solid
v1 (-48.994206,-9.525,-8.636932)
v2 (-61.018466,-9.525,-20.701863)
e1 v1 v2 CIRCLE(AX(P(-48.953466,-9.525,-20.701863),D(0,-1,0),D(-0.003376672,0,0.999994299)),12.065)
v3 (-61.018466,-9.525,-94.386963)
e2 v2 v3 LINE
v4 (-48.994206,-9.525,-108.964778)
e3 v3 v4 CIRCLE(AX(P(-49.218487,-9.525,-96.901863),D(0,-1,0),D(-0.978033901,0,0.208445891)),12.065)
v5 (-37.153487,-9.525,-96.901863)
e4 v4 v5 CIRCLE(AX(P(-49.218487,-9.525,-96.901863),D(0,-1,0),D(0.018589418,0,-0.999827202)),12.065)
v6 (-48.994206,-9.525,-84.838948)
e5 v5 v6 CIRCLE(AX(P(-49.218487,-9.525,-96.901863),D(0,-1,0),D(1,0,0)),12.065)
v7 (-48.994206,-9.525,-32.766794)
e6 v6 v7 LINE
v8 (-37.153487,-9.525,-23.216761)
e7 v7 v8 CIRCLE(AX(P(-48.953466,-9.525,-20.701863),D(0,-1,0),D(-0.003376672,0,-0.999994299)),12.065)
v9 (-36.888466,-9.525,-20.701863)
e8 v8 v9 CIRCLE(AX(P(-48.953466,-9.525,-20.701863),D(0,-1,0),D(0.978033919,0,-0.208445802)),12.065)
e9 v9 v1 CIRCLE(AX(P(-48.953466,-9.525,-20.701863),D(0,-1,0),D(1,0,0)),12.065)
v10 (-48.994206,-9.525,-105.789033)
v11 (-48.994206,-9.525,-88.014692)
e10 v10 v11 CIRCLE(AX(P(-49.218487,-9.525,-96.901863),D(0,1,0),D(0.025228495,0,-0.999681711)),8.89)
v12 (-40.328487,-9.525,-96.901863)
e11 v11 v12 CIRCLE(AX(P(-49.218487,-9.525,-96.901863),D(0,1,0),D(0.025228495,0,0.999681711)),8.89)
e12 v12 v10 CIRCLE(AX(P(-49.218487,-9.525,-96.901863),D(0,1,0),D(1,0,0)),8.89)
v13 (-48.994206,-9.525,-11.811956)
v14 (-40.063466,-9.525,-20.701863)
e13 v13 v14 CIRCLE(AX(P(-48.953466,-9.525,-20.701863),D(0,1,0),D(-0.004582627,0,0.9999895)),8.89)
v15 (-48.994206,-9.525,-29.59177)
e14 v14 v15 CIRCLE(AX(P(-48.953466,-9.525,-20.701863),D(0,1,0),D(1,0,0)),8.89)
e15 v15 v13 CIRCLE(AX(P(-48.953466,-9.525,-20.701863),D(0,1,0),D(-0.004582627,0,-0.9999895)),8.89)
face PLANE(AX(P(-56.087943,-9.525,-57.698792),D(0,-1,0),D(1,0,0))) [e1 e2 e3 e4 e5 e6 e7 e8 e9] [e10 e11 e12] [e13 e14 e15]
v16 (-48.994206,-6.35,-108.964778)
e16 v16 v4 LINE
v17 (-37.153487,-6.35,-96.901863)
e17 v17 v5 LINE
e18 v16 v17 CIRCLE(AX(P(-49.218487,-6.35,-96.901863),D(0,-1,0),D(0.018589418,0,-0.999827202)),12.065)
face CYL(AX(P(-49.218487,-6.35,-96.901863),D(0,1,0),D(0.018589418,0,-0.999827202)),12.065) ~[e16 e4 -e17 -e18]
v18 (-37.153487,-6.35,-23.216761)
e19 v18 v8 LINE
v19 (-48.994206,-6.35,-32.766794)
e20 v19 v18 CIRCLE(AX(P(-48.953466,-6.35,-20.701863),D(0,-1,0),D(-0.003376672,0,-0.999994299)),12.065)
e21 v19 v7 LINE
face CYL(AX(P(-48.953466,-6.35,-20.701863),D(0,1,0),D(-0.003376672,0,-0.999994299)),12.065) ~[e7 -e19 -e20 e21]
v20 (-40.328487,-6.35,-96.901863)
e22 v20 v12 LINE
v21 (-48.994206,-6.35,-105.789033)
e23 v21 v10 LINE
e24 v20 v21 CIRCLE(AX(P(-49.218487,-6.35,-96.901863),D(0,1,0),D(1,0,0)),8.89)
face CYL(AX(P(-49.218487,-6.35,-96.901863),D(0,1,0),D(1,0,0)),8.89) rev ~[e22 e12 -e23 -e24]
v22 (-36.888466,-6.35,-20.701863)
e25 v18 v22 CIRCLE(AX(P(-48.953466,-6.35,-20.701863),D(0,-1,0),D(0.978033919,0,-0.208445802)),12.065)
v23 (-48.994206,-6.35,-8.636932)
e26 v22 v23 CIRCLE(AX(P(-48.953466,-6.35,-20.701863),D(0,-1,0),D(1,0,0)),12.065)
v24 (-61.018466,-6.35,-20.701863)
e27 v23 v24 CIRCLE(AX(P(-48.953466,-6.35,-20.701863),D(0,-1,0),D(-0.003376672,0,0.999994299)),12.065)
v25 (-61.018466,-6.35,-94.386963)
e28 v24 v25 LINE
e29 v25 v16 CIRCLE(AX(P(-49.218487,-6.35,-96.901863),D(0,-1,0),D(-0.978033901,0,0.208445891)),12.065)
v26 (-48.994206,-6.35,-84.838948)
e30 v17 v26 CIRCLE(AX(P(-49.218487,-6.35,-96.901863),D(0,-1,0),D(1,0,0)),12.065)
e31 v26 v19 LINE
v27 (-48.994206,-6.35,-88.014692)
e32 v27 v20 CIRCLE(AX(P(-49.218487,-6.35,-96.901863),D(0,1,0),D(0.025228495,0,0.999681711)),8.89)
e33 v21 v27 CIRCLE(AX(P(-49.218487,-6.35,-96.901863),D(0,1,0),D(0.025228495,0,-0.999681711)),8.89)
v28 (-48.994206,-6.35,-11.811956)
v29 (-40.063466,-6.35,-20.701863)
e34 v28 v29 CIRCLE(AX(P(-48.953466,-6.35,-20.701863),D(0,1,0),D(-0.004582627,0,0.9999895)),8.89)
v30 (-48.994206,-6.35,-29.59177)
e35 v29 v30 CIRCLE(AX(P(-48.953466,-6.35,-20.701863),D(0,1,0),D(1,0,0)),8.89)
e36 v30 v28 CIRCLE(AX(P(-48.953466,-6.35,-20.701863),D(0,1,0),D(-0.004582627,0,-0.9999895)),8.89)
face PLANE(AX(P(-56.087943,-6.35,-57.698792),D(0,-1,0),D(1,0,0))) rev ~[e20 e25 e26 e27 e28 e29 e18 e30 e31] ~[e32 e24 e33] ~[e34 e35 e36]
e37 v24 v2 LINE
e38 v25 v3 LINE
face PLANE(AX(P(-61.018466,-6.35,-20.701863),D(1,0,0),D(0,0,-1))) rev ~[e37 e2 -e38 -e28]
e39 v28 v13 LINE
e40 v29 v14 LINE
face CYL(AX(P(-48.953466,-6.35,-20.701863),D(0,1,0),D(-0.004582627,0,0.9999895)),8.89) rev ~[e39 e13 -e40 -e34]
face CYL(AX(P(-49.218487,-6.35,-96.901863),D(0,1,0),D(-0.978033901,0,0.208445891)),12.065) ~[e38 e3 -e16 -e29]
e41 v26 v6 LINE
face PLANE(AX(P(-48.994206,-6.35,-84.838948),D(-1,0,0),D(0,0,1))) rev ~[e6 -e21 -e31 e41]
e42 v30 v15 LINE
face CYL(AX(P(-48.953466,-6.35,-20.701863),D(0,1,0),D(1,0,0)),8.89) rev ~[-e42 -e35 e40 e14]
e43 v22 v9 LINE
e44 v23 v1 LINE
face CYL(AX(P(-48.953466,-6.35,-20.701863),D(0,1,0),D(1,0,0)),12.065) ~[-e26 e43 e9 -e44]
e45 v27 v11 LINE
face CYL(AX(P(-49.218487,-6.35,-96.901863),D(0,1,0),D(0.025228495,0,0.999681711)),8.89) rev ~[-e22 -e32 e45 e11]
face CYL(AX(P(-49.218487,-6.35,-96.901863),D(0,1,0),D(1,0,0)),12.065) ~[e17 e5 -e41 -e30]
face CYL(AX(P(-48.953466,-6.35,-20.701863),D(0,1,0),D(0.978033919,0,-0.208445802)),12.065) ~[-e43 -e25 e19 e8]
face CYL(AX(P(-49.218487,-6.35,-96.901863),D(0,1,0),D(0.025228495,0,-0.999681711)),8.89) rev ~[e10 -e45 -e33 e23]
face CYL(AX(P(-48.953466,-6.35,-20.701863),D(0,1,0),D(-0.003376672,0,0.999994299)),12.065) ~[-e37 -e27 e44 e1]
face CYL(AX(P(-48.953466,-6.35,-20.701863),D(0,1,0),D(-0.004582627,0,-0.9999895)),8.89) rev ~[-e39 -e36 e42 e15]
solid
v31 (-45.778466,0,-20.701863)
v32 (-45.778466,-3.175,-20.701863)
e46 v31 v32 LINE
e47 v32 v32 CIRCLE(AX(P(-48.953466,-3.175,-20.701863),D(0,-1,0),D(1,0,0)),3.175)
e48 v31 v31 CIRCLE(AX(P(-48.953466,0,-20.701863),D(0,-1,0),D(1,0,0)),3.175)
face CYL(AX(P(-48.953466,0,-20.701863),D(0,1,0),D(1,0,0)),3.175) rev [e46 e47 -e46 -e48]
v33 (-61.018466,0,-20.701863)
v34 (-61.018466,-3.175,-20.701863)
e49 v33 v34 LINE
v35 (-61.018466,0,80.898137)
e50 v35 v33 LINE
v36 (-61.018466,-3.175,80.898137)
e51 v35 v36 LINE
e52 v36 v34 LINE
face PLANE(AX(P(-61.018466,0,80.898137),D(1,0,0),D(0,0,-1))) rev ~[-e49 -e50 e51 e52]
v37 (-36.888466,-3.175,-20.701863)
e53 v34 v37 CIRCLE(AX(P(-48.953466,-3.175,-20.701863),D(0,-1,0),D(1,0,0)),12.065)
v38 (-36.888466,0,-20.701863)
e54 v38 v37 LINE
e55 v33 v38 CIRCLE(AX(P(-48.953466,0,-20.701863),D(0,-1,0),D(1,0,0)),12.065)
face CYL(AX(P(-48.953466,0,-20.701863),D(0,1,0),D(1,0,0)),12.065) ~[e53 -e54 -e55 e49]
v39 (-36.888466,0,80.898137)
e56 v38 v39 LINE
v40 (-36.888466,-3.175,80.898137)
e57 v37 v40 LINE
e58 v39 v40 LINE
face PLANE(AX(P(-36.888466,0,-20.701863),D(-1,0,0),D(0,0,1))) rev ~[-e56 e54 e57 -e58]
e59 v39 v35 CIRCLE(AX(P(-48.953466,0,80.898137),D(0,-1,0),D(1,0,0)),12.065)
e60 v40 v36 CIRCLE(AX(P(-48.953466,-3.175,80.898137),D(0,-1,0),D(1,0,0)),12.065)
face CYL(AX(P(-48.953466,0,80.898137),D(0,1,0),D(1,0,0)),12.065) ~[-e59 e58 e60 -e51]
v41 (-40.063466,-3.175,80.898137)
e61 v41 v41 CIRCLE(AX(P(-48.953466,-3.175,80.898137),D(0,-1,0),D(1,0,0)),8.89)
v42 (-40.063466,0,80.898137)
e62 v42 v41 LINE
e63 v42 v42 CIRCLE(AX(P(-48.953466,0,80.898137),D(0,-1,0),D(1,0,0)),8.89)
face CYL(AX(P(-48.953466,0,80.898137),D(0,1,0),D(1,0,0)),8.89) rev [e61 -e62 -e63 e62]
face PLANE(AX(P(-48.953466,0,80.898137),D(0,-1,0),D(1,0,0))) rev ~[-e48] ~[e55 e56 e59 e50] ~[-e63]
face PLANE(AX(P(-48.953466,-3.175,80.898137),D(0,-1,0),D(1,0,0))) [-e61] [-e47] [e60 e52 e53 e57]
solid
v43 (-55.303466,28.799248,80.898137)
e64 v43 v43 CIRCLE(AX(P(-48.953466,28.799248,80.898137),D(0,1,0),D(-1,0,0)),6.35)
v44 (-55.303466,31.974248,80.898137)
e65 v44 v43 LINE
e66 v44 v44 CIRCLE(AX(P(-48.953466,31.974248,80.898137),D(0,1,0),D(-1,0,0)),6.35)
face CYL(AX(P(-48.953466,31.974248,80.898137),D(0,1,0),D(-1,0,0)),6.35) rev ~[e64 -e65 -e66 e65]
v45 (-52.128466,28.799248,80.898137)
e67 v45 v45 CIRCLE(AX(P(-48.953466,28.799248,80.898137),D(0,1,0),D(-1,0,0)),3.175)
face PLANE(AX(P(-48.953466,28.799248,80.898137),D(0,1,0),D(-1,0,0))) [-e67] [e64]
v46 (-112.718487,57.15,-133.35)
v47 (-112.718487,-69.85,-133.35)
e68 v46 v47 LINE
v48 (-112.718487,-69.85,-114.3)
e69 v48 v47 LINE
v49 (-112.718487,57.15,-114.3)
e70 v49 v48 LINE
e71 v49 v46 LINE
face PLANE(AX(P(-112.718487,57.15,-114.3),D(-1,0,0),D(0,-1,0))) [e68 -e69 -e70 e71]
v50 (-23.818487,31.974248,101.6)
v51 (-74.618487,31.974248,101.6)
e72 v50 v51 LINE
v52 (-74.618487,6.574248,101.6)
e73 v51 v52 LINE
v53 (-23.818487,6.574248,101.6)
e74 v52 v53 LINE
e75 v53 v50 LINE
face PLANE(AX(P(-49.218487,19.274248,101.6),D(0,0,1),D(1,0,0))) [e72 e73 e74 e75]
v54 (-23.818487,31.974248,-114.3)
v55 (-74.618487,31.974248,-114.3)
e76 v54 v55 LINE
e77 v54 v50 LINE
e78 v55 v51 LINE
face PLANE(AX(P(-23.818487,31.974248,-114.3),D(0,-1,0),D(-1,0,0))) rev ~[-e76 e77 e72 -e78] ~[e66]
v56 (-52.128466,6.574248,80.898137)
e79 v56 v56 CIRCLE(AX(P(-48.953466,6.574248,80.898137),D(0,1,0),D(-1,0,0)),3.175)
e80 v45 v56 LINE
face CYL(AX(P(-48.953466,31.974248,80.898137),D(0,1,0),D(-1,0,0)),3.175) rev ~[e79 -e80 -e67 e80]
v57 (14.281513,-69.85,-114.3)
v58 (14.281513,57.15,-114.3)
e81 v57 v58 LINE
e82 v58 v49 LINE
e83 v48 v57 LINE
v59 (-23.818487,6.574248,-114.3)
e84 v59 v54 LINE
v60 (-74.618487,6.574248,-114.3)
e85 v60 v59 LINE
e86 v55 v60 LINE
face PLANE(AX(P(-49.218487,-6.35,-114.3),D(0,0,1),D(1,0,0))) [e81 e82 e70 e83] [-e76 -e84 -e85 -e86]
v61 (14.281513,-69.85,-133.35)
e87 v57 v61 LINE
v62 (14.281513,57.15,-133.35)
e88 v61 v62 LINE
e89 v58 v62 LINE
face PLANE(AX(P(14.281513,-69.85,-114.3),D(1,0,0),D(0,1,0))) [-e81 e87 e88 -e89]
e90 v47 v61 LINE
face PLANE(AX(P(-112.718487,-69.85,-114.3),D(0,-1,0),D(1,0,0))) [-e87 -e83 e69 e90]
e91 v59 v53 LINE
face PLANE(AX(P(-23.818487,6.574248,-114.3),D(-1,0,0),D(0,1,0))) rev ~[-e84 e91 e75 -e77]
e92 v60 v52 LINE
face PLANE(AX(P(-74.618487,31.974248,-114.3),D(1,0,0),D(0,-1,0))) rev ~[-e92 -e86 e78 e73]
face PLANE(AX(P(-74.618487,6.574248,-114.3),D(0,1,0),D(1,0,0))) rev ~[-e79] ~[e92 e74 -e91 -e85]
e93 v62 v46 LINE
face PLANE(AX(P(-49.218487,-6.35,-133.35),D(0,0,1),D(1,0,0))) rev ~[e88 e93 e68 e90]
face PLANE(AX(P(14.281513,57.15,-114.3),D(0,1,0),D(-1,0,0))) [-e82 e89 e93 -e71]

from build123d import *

# Parameters (mm, degrees)
F0_R      = 8.89
F0_R_2    = 3.175
F1_DEPTH  = 3.175
F4_DEPTH  = 3.175
F7_DEPTH  = 19.05
F9_DEPTH  = 215.9
F10_R     = 3.175
F11_DEPTH = 101.8252484294
F10_R_2   = 6.35
F12_DEPTH = 3.175


with BuildPart() as f1:
    # F0 (on Front) → F1 (new body)
    with BuildSketch(Plane.XZ):
        with BuildLine():
            ThreePointArc((-61.0184661174, 80.8981371284), (-48.9534661174, 68.8331371284), (-36.8884661174, 80.8981371284))
            ThreePointArc((-36.8884661174, 80.8981371284), (-48.9534661174, 92.9631371284), (-61.0184661174, 80.8981371284))
        make_face()
        with Locations((-48.9534661174, 80.8981371284)):
            Circle(F0_R, mode=Mode.SUBTRACT)
        with BuildLine():
            Line((-36.8884661174, -20.7018628716), (-36.8884661174, 80.8981371284))
            ThreePointArc((-36.8884661174, 80.8981371284), (-48.9534661174, 68.8331371284), (-61.0184661174, 80.8981371284))
            Line((-61.0184661174, 80.8981371284), (-61.0184661174, -20.7018628716))
            ThreePointArc((-61.0184661174, -20.7018628716), (-48.9534661174, -8.6368628716), (-36.8884661174, -20.7018628716))
        make_face()
        with BuildLine():
            ThreePointArc((-61.0184661174, -20.7018628716), (-48.9534661174, -32.7668628716), (-36.8884661174, -20.7018628716))
            ThreePointArc((-36.8884661174, -20.7018628716), (-48.9534661174, -8.6368628716), (-61.0184661174, -20.7018628716))
        make_face()
        with Locations((-48.9534661174, -20.7018628716)):
            Circle(F0_R_2, mode=Mode.SUBTRACT)
    extrude(amount=F1_DEPTH)


with BuildPart() as f4:
    # F3 (on offset) → F4 (new body)
    with BuildSketch(Plane.XZ.offset(6.35)):
        with BuildLine():
            Line((-48.9942056675, -84.8389475658), (-48.9942056675, -32.7667940894))
            ThreePointArc((-48.9942056675, -32.7667940894), (-57.4991008999, -29.218690401), (-61.0184661174, -20.7018628716))
            Line((-61.0184661174, -20.7018628716), (-61.0184661174, -94.3869631738))
            ThreePointArc((-61.0184661174, -94.3869631738), (-56.7211762043, -87.453377151), (-48.9942056675, -84.8389475658))
        make_face()
        with BuildLine():
            ThreePointArc((-48.9942056675, -29.5917695241), (-57.8434661174, -20.7018628716), (-48.9942056675, -11.8119562192))
            Line((-48.9942056675, -11.8119562192), (-48.9942056675, -8.6369316539))
            ThreePointArc((-48.9942056675, -8.6369316539), (-57.4991008999, -12.1850353423), (-61.0184661174, -20.7018628716))
            ThreePointArc((-61.0184661174, -20.7018628716), (-57.4991008999, -29.218690401), (-48.9942056675, -32.7667940894))
            Line((-48.9942056675, -32.7667940894), (-48.9942056675, -29.5917695241))
        make_face()
        with BuildLine():
            Line((-48.9942056675, -8.6369316539), (-48.9942056675, -11.8119562192))
            ThreePointArc((-48.9942056675, -11.8119562192), (-42.6817069782, -14.4012964447), (-40.0634661174, -20.7018628716))
            ThreePointArc((-40.0634661174, -20.7018628716), (-42.6817069782, -27.0024292986), (-48.9942056675, -29.5917695241))
            Line((-48.9942056675, -29.5917695241), (-48.9942056675, -32.7667940894))
            ThreePointArc((-48.9942056675, -32.7667940894), (-41.3791205839, -30.0930030974), (-37.1534868789, -23.2167614721))
            ThreePointArc((-37.1534868789, -23.2167614721), (-36.9549042345, -21.9662748866), (-36.8884661174, -20.7018628716))
            ThreePointArc((-36.8884661174, -20.7018628716), (-40.4366385881, -12.1562280891), (-48.9942056675, -8.6369316539))
        make_face()
        with BuildLine():
            Line((-48.9942056675, -88.0146923465), (-48.9942056675, -84.8389475658))
            ThreePointArc((-48.9942056675, -84.8389475658), (-56.7211762043, -87.453377151), (-61.0184661174, -94.3869631738))
            ThreePointArc((-61.0184661174, -94.3869631738), (-58.5258694104, -104.5788974785), (-48.9942056675, -108.9647781775))
            Line((-48.9942056675, -108.9647781775), (-48.9942056675, -105.7890333968))
            ThreePointArc((-48.9942056675, -105.7890333968), (-58.1084871101, -96.9018628716), (-48.9942056675, -88.0146923465))
        make_face()
        with BuildLine():
            ThreePointArc((-37.1534868789, -96.9018628716), (-40.6083133021, -88.450286878), (-48.9942056675, -84.8389475658))
            Line((-48.9942056675, -84.8389475658), (-48.9942056675, -88.0146923465))
            ThreePointArc((-48.9942056675, -88.0146923465), (-42.8535061195, -90.6954854648), (-40.3284868789, -96.9018628716))
            ThreePointArc((-40.3284868789, -96.9018628716), (-42.8535061195, -103.1082402785), (-48.9942056675, -105.7890333968))
            Line((-48.9942056675, -105.7890333968), (-48.9942056675, -108.9647781775))
            ThreePointArc((-48.9942056675, -108.9647781775), (-40.6083133021, -105.3534388653), (-37.1534868789, -96.9018628716))
        make_face()
    extrude(amount=F4_DEPTH)


with BuildPart() as f7:
    # F6 (on offset) → F7 (new body)
    with BuildSketch(Plane.XY.offset(-114.3)):
        Polygon((14.2815130055, -69.85), (14.2815130055, 57.15), (-49.2184869945, 57.15), (-112.7184869945, 57.15), (-112.7184869945, -69.85), align=None)
    extrude(amount=-F7_DEPTH)

    # F8 (on offset) → F9 (join)
    with BuildSketch(Plane.XY.offset(-114.3)):
        Polygon((-74.6184869945, 6.5742484294), (-49.2184869945, 6.5742484294), (-23.8184869945, 6.5742484294), (-23.8184869945, 31.9742484294), (-74.6184869945, 31.9742484294), align=None)
    extrude(amount=F9_DEPTH)

    # F10 (on face) → F11 (cut, through all)
    with BuildSketch(Plane(origin=(0, 31.9742484294, 0), x_dir=(-1, 0, 0), z_dir=(0, 1, 0))):
        with Locations((48.9534661174, 80.8981371284)):
            Circle(F10_R)
    extrude(amount=-F11_DEPTH, mode=Mode.SUBTRACT)

    # F10 (on face) → F12 (cut)
    with BuildSketch(Plane(origin=(0, 31.9742484294, 0), x_dir=(-1, 0, 0), z_dir=(0, 1, 0))):
        with Locations((48.9534661174, 80.8981371284)):
            Circle(F10_R_2)
        with Locations((48.9534661174, 80.8981371284)):
            Circle(F10_R, mode=Mode.SUBTRACT)
        with Locations((48.9534661174, 80.8981371284)):
            Circle(F10_R)
    extrude(amount=-F12_DEPTH, mode=Mode.SUBTRACT)


solid = Compound([f1.part, f4.part, f7.part])
